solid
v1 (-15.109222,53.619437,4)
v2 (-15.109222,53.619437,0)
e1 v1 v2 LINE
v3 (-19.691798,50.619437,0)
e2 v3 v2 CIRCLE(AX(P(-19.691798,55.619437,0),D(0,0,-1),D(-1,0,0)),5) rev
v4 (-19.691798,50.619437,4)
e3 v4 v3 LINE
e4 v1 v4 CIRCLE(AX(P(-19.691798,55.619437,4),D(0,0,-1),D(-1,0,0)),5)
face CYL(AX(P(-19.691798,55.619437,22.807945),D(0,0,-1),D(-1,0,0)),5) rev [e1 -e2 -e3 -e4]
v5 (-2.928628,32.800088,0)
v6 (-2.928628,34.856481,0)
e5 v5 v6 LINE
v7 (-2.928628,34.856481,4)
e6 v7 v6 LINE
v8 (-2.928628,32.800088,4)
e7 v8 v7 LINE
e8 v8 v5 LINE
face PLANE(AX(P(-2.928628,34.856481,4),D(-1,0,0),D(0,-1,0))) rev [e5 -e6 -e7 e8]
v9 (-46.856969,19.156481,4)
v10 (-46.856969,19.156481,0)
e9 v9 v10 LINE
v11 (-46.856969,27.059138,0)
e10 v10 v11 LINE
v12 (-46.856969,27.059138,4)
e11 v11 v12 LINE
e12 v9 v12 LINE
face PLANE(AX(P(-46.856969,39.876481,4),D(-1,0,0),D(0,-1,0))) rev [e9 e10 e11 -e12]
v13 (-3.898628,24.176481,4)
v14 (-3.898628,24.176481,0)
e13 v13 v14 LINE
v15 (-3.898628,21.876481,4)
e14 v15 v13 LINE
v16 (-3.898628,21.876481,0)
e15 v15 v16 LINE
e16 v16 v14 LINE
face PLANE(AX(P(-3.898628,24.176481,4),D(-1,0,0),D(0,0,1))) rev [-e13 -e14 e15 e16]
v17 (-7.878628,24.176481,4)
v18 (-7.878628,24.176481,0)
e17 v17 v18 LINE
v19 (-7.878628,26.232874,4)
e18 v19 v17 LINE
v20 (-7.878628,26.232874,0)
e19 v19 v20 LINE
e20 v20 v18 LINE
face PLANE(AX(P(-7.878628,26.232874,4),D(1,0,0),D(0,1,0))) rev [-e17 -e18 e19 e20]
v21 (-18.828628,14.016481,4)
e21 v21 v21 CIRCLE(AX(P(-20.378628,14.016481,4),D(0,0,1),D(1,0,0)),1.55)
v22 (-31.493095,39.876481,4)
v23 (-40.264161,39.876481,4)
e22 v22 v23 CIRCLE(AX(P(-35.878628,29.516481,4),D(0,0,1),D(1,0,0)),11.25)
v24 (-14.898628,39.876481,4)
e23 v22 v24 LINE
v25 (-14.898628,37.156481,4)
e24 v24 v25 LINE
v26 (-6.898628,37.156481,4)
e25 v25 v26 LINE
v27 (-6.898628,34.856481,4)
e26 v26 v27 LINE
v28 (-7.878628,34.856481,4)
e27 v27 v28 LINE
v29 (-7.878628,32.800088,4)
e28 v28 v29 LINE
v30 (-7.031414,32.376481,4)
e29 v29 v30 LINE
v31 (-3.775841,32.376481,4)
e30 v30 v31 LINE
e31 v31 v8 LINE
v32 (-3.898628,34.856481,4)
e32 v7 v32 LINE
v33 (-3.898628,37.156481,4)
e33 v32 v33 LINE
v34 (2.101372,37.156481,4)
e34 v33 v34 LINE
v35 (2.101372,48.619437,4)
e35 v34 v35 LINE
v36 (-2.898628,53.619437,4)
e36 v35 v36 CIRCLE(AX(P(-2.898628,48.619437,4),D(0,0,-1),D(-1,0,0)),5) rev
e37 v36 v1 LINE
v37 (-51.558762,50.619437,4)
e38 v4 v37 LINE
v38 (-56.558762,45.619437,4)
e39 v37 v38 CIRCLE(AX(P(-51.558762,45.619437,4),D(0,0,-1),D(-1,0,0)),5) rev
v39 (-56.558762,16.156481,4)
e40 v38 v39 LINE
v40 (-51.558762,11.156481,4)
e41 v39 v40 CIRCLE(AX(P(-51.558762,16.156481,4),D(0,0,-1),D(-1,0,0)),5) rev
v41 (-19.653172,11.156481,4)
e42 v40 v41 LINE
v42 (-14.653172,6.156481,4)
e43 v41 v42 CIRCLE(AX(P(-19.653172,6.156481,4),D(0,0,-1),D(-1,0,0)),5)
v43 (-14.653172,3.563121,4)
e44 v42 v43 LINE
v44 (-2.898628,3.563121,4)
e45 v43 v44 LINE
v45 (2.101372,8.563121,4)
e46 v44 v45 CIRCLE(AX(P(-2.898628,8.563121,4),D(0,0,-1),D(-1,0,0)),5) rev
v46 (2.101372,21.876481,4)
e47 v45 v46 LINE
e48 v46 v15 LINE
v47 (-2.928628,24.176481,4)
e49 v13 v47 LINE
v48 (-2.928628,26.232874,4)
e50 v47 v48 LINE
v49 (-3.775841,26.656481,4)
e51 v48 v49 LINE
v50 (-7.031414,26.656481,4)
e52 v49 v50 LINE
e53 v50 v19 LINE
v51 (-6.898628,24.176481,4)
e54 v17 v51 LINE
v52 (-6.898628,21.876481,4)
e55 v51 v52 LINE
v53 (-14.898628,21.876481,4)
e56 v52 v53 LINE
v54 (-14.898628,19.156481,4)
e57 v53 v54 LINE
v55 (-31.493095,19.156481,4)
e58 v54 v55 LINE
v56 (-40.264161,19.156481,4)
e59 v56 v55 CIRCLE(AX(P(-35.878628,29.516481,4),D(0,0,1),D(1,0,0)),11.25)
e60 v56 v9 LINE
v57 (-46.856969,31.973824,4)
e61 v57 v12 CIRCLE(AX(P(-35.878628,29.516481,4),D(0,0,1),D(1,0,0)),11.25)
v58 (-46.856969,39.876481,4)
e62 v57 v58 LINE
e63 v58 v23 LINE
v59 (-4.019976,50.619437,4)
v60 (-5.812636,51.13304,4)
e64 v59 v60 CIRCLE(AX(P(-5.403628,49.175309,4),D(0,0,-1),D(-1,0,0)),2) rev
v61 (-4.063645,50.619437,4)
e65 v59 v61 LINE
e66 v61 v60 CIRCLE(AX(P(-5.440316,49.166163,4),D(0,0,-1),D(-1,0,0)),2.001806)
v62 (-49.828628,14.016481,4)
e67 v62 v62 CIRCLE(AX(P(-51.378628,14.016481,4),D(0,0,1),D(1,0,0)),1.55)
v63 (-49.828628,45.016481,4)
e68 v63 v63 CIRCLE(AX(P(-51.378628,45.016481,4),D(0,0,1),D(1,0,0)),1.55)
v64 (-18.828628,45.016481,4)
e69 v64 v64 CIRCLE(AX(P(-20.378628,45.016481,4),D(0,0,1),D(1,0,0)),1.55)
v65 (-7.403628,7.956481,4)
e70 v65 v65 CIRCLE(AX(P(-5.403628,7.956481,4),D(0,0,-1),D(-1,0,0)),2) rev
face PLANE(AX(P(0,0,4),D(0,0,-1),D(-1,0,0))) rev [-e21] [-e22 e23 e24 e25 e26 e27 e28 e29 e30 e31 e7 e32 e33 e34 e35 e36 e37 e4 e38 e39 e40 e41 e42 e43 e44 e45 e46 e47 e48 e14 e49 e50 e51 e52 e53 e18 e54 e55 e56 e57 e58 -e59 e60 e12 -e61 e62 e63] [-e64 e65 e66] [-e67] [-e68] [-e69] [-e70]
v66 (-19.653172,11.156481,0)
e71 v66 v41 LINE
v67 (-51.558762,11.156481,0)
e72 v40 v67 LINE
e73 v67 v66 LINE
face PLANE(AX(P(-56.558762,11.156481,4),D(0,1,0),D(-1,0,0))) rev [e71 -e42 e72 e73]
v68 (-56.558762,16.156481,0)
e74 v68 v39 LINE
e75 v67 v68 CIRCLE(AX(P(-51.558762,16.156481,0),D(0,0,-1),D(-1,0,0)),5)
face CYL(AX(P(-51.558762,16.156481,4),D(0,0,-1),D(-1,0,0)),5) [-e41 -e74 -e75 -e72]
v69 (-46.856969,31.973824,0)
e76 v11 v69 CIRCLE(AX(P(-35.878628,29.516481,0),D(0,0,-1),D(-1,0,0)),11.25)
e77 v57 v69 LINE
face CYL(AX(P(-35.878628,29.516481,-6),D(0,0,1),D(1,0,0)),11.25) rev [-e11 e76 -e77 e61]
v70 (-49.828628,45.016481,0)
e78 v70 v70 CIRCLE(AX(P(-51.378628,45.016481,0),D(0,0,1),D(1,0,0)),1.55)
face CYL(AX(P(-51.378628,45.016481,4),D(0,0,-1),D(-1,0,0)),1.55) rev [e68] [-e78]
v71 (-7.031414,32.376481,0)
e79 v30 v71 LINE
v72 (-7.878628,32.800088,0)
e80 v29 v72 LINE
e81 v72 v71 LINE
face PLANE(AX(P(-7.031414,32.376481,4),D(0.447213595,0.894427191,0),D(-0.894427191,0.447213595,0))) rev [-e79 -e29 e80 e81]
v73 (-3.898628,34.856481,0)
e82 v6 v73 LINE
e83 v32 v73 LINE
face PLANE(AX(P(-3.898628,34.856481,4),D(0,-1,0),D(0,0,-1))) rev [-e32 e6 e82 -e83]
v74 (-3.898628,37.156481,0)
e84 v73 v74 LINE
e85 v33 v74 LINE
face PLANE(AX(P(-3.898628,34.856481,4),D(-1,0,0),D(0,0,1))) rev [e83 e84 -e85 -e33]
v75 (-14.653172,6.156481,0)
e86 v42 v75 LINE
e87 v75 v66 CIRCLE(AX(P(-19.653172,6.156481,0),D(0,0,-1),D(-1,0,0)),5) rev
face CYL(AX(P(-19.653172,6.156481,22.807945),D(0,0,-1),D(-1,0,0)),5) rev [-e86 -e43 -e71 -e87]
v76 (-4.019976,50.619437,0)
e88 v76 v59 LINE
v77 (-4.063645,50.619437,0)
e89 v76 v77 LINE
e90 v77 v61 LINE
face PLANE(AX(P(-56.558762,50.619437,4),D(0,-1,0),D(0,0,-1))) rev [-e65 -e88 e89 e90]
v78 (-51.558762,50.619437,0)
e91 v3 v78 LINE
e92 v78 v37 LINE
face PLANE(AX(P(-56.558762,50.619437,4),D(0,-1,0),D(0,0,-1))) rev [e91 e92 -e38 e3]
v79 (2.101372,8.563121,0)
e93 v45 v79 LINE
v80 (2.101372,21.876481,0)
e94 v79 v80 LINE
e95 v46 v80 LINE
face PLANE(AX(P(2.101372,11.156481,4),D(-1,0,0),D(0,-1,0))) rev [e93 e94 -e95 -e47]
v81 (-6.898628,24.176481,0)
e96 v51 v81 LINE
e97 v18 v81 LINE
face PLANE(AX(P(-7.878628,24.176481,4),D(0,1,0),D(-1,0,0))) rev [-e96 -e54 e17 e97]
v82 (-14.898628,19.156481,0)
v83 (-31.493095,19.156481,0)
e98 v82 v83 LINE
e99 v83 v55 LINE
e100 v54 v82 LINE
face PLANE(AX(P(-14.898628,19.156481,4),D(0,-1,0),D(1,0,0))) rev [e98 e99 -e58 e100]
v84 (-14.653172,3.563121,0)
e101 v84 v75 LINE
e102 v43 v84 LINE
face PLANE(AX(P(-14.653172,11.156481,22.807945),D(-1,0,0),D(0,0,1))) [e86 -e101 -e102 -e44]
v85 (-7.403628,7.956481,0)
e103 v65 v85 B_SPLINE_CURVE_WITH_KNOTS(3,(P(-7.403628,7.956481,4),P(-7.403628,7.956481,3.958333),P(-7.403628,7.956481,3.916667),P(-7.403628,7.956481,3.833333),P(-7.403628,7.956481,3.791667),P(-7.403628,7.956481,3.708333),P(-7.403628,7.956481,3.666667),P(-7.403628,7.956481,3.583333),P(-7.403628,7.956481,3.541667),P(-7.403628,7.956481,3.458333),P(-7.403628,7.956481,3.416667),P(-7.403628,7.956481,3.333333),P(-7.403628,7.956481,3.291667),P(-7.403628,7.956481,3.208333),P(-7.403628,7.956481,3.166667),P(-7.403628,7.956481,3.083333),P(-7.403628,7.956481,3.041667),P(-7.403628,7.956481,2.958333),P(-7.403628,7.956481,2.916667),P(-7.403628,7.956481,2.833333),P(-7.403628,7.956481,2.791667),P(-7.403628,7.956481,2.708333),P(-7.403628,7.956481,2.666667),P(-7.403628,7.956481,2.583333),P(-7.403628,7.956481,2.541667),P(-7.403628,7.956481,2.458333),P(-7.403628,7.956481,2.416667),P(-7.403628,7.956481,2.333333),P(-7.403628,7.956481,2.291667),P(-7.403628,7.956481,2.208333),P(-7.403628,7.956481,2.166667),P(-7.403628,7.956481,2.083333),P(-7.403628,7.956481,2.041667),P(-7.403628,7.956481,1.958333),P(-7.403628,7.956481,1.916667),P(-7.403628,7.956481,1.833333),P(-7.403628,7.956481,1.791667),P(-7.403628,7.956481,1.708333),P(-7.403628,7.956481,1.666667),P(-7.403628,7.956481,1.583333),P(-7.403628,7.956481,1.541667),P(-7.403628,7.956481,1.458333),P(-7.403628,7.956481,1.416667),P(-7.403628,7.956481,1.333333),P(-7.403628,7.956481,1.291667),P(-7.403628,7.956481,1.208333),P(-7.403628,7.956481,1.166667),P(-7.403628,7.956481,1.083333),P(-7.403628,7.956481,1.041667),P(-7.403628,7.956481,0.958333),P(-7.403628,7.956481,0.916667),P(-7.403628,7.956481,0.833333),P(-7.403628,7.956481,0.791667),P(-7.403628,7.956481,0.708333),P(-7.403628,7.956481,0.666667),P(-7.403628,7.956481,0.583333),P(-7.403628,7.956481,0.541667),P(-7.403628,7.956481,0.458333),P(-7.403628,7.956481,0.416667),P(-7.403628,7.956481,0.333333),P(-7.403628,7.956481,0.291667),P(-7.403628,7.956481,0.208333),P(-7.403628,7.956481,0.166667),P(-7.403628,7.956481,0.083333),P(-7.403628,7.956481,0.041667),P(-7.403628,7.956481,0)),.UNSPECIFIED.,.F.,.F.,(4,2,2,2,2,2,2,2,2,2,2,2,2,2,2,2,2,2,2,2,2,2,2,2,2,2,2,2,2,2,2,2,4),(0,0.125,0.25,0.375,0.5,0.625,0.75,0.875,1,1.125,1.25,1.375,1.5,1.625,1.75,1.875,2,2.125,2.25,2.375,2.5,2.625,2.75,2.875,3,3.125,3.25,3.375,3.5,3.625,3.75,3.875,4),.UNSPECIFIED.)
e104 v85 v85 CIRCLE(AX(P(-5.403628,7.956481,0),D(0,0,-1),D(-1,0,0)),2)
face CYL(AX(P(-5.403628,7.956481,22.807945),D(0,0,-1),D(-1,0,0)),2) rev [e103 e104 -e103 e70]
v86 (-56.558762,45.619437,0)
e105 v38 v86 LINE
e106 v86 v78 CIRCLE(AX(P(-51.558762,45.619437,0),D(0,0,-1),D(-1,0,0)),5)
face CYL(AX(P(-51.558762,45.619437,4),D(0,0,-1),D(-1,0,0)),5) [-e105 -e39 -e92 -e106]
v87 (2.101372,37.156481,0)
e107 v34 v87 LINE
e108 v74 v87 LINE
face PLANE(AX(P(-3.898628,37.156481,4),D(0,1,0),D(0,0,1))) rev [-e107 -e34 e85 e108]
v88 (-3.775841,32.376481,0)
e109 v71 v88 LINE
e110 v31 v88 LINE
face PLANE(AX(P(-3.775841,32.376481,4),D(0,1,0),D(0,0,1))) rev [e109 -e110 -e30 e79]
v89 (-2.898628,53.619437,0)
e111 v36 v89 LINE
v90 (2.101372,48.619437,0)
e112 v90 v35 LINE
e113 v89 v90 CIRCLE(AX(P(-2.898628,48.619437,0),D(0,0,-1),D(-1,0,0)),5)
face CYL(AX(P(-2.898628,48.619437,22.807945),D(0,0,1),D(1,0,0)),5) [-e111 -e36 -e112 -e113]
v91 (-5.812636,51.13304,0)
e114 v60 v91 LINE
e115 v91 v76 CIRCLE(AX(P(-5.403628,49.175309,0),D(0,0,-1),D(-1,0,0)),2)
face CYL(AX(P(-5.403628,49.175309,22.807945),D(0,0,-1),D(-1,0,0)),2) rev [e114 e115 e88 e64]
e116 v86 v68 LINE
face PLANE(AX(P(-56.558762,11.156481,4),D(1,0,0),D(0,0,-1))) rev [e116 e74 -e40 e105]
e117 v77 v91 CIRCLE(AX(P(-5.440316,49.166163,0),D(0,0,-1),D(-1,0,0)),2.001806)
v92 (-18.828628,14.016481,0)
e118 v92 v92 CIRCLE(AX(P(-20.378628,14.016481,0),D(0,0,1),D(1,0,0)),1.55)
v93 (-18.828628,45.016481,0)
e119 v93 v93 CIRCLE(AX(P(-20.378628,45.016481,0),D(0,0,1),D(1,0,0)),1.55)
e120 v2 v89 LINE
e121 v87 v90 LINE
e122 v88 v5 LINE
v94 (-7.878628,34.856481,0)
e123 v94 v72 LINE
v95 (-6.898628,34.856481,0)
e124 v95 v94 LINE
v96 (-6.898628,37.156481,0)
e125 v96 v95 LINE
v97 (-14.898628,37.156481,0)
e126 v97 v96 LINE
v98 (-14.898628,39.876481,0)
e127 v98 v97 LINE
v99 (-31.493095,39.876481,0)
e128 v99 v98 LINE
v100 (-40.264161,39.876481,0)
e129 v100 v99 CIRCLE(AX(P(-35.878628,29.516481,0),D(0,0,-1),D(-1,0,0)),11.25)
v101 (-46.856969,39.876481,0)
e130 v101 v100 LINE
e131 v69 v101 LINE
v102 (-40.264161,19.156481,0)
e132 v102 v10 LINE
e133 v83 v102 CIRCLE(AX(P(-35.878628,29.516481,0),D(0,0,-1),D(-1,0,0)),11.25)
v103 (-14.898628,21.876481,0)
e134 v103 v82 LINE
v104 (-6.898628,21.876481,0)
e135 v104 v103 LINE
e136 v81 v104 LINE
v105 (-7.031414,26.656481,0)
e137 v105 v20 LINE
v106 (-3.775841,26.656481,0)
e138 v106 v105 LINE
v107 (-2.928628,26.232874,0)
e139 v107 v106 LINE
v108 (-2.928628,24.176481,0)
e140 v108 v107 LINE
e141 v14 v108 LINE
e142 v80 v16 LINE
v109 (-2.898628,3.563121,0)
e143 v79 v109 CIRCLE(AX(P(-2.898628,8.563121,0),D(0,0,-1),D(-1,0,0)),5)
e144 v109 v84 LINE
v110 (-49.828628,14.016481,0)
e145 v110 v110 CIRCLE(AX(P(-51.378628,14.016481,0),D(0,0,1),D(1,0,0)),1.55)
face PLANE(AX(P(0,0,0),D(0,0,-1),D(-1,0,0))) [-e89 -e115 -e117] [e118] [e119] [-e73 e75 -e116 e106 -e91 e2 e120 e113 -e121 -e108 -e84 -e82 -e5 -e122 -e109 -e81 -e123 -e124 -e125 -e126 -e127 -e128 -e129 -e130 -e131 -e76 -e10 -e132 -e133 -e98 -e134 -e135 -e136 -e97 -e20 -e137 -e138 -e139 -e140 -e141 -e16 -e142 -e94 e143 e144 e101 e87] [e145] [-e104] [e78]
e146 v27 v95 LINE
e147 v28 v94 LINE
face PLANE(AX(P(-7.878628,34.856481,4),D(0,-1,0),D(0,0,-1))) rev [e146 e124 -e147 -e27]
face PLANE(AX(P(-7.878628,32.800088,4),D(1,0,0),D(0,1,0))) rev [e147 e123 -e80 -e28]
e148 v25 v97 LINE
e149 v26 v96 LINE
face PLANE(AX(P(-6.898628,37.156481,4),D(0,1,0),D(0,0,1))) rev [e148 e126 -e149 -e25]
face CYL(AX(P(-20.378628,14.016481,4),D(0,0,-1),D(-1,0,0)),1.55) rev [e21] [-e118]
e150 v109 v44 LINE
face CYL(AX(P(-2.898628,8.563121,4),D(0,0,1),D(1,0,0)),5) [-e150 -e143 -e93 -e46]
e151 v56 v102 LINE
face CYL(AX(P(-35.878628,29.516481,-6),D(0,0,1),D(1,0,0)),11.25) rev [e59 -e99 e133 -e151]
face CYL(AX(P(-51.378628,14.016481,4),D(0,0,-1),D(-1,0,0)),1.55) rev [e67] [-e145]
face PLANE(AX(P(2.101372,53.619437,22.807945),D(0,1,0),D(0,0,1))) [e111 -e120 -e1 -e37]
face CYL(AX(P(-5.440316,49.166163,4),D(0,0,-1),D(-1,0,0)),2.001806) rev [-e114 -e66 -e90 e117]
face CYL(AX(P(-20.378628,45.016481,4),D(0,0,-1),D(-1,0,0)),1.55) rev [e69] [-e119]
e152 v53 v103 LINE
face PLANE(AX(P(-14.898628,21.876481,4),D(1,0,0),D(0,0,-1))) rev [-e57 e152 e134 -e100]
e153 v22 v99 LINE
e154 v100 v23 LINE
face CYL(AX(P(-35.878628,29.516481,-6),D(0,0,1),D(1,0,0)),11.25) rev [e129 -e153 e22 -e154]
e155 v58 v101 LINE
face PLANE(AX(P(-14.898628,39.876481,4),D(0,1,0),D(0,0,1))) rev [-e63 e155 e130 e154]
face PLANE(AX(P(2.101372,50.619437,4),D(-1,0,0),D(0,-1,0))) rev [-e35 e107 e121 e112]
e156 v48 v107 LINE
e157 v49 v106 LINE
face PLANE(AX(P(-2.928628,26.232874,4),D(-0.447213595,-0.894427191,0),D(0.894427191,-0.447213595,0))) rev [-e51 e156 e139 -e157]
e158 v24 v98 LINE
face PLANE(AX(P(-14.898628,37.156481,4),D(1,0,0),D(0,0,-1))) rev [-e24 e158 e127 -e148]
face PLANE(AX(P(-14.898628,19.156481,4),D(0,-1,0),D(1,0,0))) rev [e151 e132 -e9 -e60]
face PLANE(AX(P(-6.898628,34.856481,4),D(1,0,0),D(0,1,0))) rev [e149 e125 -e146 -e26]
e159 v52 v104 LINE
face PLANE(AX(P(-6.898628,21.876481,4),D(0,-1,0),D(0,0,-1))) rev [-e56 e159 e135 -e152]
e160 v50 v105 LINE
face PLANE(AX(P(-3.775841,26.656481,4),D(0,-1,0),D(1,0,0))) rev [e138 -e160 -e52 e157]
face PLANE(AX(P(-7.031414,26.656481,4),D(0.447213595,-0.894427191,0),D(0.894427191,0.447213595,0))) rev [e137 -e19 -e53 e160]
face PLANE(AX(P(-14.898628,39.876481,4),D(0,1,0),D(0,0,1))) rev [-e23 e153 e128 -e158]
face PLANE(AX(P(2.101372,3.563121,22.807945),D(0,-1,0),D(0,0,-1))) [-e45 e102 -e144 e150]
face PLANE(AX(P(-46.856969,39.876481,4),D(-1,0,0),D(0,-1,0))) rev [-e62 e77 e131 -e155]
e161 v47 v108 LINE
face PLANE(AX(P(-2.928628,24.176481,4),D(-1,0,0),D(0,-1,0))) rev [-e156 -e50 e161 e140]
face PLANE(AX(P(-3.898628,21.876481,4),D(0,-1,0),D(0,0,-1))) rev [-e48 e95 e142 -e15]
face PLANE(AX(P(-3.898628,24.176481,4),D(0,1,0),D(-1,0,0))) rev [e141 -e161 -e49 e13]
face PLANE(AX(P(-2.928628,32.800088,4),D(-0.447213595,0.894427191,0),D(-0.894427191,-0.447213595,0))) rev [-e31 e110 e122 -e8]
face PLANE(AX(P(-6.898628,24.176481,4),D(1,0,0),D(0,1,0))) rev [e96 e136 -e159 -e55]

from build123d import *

# Parameters (mm, degrees)
SKETCH1_R           = 1.55
BOSS_EXTRUDE1_DEPTH = 4
SKETCH2_R           = 11.25
CUT_EXTRUDE1_DEPTH  = 10
SKETCH4_R           = 2
SKETCH4_W           = 16.7545444
SKETCH4_H           = 7.593360653
BOSS_EXTRUDE2_DEPTH = 4
SKETCH5_R           = 2.001806379
CUT_EXTRUDE2_DEPTH  = 79.038052705
FILLET1_R           = 5


with BuildPart() as part:
    # Sketch1 → Boss-Extrude1 (new body)
    with BuildSketch(Plane.XY):
        Polygon((-6.898627884, 24.176481231), (-6.898627884, 21.876481231), (-14.898627884, 21.876481231), (-14.898627884, 19.156481231), (-46.856968571, 19.156481231), (-46.856968571, 39.876481231), (-14.898627884, 39.876481231), (-14.898627884, 37.156481231), (-6.898627884, 37.156481231), (-6.898627884, 34.856481231), (-7.878627884, 34.856481231), (-7.878627884, 32.800088029), (-7.031414289, 32.376481231), (-3.77584148, 32.376481231), (-2.928627884, 32.800088029), (-2.928627884, 34.856481231), (-3.898627884, 34.856481231), (-3.898627884, 37.156481231), (2.101372116, 37.156481231), (2.101372116, 47.876481231), (2.101372116, 50.619437371), (-56.558762416, 50.619437371), (-56.558762416, 47.876481231), (-56.558762416, 39.876481231), (-56.558762416, 19.156481231), (-56.558762416, 11.156481231), (2.101372116, 11.156481231), (2.101372116, 21.876481231), (-3.898627884, 21.876481231), (-3.898627884, 24.176481231), (-2.928627884, 24.176481231), (-2.928627884, 26.232874433), (-3.77584148, 26.656481231), (-7.031414289, 26.656481231), (-7.878627884, 26.232874433), (-7.878627884, 24.176481231), align=None)
        with Locations((-51.378627884, 14.016481231)):
            Circle(SKETCH1_R, mode=Mode.SUBTRACT)
        with Locations((-20.378627884, 14.016481231)):
            Circle(SKETCH1_R, mode=Mode.SUBTRACT)
        with Locations((-51.378627884, 45.016481231)):
            Circle(SKETCH1_R, mode=Mode.SUBTRACT)
        with Locations((-20.378627884, 45.016481231)):
            Circle(SKETCH1_R, mode=Mode.SUBTRACT)
    extrude(amount=BOSS_EXTRUDE1_DEPTH)

    # Sketch2 → Cut-Extrude1 (cut)
    with BuildSketch(Plane.XY.offset(4)):
        with Locations((-35.878627884, 29.516481231)):
            Circle(SKETCH2_R)
    extrude(amount=-CUT_EXTRUDE1_DEPTH, mode=Mode.SUBTRACT)

    # Sketch4 → Boss-Extrude2 (add)
    # profile 1 of 2: a face of its own
    with BuildSketch(Plane(origin=(0, 0, 0), x_dir=(-1, 0, 0), z_dir=(0, 0, -1))):
        Polygon((-2.101372116, 50.619437371), (-2.101372116, 53.619437371), (15.109222475, 53.619437371), (15.109222475, 50.619437371), (15.109222475, 46.213030652), (-2.101372116, 46.03430596), align=None)
        with Locations((5.403627884, 49.175308869)):
            Circle(SKETCH4_R, mode=Mode.SUBTRACT)
    # profile 2 of 2: a face of its own
    with BuildSketch(Plane(origin=(0, 0, 0), x_dir=(-1, 0, 0), z_dir=(0, 0, -1))):
        with Locations((6.275900084, 7.359800905)):
            Rectangle(SKETCH4_W, SKETCH4_H)
        with Locations((5.403627884, 7.956481231)):
            Circle(SKETCH4_R, mode=Mode.SUBTRACT)
    extrude(amount=-BOSS_EXTRUDE2_DEPTH)

    # Sketch5 → Cut-Extrude2 (cut, through all)
    with BuildSketch(Plane(origin=(0, 0, 0), x_dir=(-1, 0, 0), z_dir=(0, 0, -1))):
        with Locations((5.440315917, 49.166162951)):
            Circle(SKETCH5_R)
    extrude(amount=-CUT_EXTRUDE2_DEPTH, mode=Mode.SUBTRACT)

    # Fillet1
    # the kernel refuses this fillet: 5 mm, written as the material it adds along each edge
    with BuildSketch(Plane(origin=(-14.653172284, 11.156481231, 0), x_dir=(0, -1, 0), z_dir=(0, 0, 1))) as fillet1_piece_1:
        with BuildLine():
            CenterArc((FILLET1_R, -FILLET1_R), FILLET1_R, 90, 90)
            Line((0, -FILLET1_R), (0, 0))
            Line((0, 0), (FILLET1_R, 0))
        make_face()
    extrude(amount=4)
    with BuildSketch(Plane(origin=(-15.109222475, 50.619437371, 0), x_dir=(-1, 0, 0), z_dir=(0, 0, 1))) as fillet1_piece_2:
        with BuildLine():
            CenterArc((4.582575695, -5), FILLET1_R, 90, 66.421821522)
            Line((0, -3), (0, 0))
            Line((0, 0), (4.582575695, 0))
        make_face()
    extrude(amount=4)
    # the kernel refuses this fillet: 5 mm, written as the material it takes off along each edge
    with BuildSketch(Plane(origin=(2.101372116, 53.619437371, -12.5), x_dir=(0, -1, 0), z_dir=(0, 0, 1)), Plane(origin=(2.101372116, 3.563120578, -12.5), x_dir=(-1, 0, 0), z_dir=(0, 0, 1)), Plane(origin=(-56.558762416, 11.156481231, -12.5), x_dir=(0, 1, 0), z_dir=(0, 0, 1)), Plane(origin=(-56.558762416, 50.619437371, -12.5), x_dir=(1, 0, 0), z_dir=(0, 0, 1))) as fillet1_2_piece_1:
        with BuildLine():
            CenterArc((FILLET1_R, -FILLET1_R), FILLET1_R, 90, 90)
            Line((0, -FILLET1_R), (0, 0))
            Line((0, 0), (FILLET1_R, 0))
        make_face()
    extrude(amount=29, mode=Mode.SUBTRACT)


solid = part.part
